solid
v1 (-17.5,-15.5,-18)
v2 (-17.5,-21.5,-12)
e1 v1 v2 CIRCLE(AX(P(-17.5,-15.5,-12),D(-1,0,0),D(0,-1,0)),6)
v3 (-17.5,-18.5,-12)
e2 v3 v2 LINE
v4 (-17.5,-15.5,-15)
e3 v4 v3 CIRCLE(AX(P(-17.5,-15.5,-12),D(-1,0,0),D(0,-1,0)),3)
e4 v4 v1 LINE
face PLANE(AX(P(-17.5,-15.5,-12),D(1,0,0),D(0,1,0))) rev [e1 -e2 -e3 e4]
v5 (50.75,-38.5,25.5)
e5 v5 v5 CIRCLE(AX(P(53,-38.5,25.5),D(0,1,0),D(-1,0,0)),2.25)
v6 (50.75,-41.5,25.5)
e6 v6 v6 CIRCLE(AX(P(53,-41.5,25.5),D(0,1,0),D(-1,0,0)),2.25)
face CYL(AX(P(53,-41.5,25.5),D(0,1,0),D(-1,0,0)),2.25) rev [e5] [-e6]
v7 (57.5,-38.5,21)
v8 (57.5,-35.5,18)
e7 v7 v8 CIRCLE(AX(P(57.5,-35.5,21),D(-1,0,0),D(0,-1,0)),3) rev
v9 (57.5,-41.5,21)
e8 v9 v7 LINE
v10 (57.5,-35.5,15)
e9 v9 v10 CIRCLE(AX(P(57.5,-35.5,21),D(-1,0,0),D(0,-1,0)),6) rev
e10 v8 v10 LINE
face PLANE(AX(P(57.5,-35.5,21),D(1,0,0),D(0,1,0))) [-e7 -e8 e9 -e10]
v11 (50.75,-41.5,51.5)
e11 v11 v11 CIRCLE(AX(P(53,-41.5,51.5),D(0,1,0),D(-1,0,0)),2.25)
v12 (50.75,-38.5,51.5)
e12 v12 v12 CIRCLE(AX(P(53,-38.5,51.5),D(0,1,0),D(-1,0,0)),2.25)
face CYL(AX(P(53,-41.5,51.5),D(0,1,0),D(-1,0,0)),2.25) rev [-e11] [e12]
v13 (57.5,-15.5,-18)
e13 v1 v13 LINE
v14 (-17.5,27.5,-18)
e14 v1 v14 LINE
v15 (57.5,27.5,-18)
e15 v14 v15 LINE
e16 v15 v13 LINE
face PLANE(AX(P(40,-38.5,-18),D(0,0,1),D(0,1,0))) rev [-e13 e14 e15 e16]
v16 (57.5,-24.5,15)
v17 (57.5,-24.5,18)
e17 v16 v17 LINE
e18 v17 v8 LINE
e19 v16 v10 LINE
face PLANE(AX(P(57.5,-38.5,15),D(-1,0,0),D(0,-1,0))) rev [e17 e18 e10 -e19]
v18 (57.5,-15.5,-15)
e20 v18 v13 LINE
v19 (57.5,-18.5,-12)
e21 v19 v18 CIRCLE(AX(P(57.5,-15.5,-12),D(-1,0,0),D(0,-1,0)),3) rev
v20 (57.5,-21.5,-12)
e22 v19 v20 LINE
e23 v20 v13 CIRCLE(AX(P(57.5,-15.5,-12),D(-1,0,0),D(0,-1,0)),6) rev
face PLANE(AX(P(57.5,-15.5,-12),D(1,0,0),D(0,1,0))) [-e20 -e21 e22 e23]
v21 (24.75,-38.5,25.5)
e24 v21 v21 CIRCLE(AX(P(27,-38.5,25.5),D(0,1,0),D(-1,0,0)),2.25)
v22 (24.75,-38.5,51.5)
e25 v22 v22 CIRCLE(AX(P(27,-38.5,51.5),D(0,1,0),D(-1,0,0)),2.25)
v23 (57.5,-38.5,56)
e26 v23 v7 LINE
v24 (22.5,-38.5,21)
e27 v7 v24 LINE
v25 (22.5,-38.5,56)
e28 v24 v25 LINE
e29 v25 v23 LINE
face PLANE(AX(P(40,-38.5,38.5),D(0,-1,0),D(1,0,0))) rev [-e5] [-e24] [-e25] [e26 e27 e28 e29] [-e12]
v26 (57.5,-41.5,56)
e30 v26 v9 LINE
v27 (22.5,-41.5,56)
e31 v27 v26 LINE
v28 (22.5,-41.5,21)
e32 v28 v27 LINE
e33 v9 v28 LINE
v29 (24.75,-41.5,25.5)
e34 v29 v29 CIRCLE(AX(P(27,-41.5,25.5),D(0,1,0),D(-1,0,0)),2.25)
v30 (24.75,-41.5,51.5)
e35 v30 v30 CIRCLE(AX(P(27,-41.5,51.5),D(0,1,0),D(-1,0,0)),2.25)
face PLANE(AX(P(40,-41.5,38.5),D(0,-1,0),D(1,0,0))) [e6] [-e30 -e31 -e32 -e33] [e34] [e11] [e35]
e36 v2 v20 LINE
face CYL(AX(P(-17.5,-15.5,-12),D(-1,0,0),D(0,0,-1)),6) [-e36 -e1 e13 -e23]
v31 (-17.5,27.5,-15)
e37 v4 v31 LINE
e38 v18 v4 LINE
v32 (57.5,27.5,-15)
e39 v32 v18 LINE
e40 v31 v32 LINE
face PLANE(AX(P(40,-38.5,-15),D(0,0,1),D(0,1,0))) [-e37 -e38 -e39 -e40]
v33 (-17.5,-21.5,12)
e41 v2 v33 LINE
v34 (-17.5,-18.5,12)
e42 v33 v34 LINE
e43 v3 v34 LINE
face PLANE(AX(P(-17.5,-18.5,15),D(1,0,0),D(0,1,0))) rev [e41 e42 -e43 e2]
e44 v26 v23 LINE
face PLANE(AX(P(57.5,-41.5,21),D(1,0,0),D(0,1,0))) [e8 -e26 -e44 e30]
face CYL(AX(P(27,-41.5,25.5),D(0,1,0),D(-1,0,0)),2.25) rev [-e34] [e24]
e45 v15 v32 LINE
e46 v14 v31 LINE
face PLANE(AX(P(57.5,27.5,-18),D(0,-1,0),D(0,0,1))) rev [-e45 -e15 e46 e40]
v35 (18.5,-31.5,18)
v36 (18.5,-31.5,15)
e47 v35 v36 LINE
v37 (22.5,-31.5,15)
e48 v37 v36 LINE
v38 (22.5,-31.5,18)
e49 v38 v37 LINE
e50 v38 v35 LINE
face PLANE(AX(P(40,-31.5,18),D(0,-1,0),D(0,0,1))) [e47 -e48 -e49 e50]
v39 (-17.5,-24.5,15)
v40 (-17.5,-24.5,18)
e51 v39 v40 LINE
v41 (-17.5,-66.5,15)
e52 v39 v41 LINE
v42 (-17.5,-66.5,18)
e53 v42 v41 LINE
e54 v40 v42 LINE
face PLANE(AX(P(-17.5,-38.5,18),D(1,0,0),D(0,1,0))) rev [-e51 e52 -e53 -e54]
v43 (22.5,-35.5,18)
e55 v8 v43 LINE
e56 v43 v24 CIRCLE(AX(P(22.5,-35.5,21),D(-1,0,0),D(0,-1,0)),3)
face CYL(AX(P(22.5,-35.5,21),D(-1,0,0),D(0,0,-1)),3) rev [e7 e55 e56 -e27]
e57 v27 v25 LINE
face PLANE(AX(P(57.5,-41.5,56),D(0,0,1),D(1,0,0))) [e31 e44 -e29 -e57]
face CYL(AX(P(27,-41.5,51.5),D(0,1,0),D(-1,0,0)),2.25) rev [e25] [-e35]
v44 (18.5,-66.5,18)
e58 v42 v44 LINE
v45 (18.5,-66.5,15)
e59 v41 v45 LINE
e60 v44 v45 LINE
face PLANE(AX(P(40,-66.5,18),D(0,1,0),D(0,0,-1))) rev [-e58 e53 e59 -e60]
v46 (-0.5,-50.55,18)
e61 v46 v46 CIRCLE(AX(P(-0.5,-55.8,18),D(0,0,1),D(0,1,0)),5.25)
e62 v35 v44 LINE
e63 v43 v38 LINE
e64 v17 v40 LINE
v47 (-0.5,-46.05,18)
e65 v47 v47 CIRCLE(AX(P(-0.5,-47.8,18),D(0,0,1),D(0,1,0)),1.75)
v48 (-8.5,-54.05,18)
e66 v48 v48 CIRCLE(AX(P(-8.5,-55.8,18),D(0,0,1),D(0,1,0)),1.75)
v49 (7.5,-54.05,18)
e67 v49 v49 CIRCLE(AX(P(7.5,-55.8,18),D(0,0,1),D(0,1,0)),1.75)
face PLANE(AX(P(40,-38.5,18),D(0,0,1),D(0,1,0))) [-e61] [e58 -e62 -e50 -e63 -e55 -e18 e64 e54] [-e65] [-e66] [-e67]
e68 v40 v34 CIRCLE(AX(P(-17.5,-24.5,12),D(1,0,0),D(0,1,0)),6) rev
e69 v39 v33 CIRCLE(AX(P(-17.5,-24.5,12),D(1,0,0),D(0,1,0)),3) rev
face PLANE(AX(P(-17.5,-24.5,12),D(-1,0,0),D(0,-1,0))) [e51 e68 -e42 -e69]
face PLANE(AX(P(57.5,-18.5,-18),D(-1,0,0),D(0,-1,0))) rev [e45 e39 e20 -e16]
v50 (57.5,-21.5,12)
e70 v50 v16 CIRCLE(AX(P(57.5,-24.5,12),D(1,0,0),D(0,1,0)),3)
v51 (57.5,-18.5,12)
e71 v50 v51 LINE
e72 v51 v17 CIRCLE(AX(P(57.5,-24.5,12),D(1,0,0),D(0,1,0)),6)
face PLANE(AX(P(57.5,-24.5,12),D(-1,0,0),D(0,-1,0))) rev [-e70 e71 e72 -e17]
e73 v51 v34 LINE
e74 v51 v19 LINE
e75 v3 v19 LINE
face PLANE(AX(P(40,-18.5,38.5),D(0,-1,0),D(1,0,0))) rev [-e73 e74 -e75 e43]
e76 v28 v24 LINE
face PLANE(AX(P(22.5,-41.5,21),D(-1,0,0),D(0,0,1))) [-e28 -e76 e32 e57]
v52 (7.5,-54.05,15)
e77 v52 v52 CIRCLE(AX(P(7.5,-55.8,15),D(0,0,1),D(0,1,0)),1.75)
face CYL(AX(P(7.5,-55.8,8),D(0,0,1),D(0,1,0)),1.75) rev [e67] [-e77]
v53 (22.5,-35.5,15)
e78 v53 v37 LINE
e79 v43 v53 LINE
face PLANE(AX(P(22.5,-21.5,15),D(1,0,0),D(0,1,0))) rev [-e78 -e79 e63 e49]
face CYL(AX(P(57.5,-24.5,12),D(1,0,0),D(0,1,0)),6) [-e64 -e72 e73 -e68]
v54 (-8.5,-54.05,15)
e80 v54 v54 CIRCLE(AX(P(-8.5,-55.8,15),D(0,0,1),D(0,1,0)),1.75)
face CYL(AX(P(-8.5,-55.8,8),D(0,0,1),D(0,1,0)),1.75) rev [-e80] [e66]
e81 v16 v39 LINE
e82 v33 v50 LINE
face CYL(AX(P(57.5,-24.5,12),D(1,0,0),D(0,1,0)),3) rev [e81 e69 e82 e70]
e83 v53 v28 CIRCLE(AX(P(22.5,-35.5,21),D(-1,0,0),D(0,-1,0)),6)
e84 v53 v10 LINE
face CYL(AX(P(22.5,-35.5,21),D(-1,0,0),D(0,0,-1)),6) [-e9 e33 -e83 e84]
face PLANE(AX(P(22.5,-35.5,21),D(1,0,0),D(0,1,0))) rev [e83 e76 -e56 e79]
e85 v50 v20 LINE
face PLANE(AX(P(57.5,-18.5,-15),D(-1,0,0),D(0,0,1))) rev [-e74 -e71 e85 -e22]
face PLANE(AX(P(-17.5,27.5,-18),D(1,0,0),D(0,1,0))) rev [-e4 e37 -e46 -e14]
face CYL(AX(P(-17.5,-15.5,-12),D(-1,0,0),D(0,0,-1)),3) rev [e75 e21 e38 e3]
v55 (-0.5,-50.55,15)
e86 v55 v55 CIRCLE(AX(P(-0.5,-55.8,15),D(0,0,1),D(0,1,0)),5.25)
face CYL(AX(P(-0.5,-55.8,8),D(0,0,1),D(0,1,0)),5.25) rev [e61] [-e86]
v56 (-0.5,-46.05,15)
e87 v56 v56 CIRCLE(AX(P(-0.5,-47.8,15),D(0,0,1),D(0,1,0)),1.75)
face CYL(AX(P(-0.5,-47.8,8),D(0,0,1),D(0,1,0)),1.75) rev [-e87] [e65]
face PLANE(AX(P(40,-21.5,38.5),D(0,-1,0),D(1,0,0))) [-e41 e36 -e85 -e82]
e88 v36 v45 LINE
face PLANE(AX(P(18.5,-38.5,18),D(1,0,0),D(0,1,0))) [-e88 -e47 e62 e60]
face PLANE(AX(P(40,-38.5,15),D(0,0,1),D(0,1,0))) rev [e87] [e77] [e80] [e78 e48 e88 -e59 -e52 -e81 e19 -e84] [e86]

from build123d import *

# Parameters (mm, degrees)
SKETCH1_W                    = 35
SKETCH1_H                    = 35
SKETCH1_R                    = 2.25
BASE_FLANGE1_DEPTH           = 3
EDGE_FLANGE1_DEPTH           = 35
SKETCH9_W                    = 36
SKETCH9_H                    = 35
BOSS_EXTRUDE1_DEPTH          = 3
EDGE_FLANGE2_STRIP_W         = 18
EDGE_FLANGE2_STRIP_H         = 3
EDGE_FLANGE2_STRIP_CUT_DEPTH = 75
EDGE_FLANGE2_DEPTH           = 75
EDGE_FLANGE3_STRIP_W         = 18
EDGE_FLANGE3_STRIP_H         = 3
EDGE_FLANGE3_STRIP_CUT_DEPTH = 75
EDGE_FLANGE3_DEPTH           = 75
SKETCH16_R                   = 5.25
SKETCH16_R_2                 = 1.75
CUT_EXTRUDE1_DEPTH           = 10
BODY_MOVE_COPY1_ANGLE        = 180


# Sheet-metal steps are written as plain solids
with BuildPart() as part:
    # Sketch1 → Base-Flange1 (new body)
    with BuildSketch(Plane.XY):
        Rectangle(SKETCH1_W, SKETCH1_H)
        with Locations((-13, 13)):
            Circle(SKETCH1_R, mode=Mode.SUBTRACT)
        with Locations((13, 13)):
            Circle(SKETCH1_R, mode=Mode.SUBTRACT)
        with Locations((13, -13)):
            Circle(SKETCH1_R, mode=Mode.SUBTRACT)
        with Locations((-13, -13)):
            Circle(SKETCH1_R, mode=Mode.SUBTRACT)
    extrude(amount=-BASE_FLANGE1_DEPTH)

    # Edge-Flange1 section (across the edge) → Edge-Flange1 (add)
    with BuildSketch(Plane(origin=(-17.5, -20.5, 0), x_dir=(0, 1, 0), z_dir=(1, 0, 0))):
        with BuildLine():
            Line((-3, 3), (-3, 17))
            Line((-3, 17), (0, 17))
            Line((0, 17), (0, 3))
            ThreePointArc((0, 3), (0.878679656, 0.878679656), (3, 0))
            Line((3, 0), (3, -3))
            ThreePointArc((3, -3), (-1.242640687, -1.242640687), (-3, 3))
        make_face()
    extrude(amount=EDGE_FLANGE1_DEPTH)

    # Sketch9 → Boss-Extrude1 (add)
    with BuildSketch(Plane.XZ.offset(23.5)):
        Polygon((57.5, 17), (17.5, 17), (17.5, 7), (21.5, 7), (57.5, 7), align=None)
        with Locations((39.5, -10.5)):
            Rectangle(SKETCH9_W, SKETCH9_H)
    extrude(amount=-BOSS_EXTRUDE1_DEPTH)

    # Edge-Flange2 strip (across the edge) → Edge-Flange2 strip cut (cut)
    with BuildSketch(Plane(origin=(57.5, -23.5, 17), x_dir=(0, 0, -1), z_dir=(-1, 0, 0))):
        with Locations((-6, -1.5)):
            Rectangle(EDGE_FLANGE2_STRIP_W, EDGE_FLANGE2_STRIP_H)
    extrude(amount=EDGE_FLANGE2_STRIP_CUT_DEPTH, mode=Mode.SUBTRACT)

    # Edge-Flange2 section (across the edge) → Edge-Flange2 (add)
    with BuildSketch(Plane(origin=(57.5, -23.5, 17), x_dir=(0, 0, -1), z_dir=(-1, 0, 0))):
        with BuildLine():
            Line((-3, 3), (-3, 30))
            Line((-3, 30), (0, 30))
            Line((0, 30), (0, 3))
            ThreePointArc((0, 3), (0.878679656, 0.878679656), (3, 0))
            Line((3, 0), (3, -3))
            ThreePointArc((3, -3), (-1.242640687, -1.242640687), (-3, 3))
        make_face()
    extrude(amount=EDGE_FLANGE2_DEPTH)

    # Edge-Flange3 strip (across the edge) → Edge-Flange3 strip cut (cut)
    with BuildSketch(Plane(origin=(-17.5, -53.5, 20), x_dir=(0, 1, 0), z_dir=(1, 0, 0))):
        with Locations((-6, -1.5)):
            Rectangle(EDGE_FLANGE3_STRIP_W, EDGE_FLANGE3_STRIP_H)
    extrude(amount=EDGE_FLANGE3_STRIP_CUT_DEPTH, mode=Mode.SUBTRACT)

    # Edge-Flange3 section (across the edge) → Edge-Flange3 (add)
    with BuildSketch(Plane(origin=(-17.5, -53.5, 20), x_dir=(0, 1, 0), z_dir=(1, 0, 0))):
        with BuildLine():
            Line((-3, 3), (-3, 46))
            Line((-3, 46), (0, 46))
            Line((0, 46), (0, 3))
            ThreePointArc((0, 3), (0.878679656, 0.878679656), (3, 0))
            Line((3, 0), (3, -3))
            ThreePointArc((3, -3), (-1.242640687, -1.242640687), (-3, 3))
        make_face()
    extrude(amount=EDGE_FLANGE3_DEPTH)

    # Sketch16 → Cut-Extrude1 (cut)
    with BuildSketch(Plane(origin=(0, -20.5, 0), x_dir=(1, 0, 0), z_dir=(0, 1, 0))):
        with Locations(Location((40.5, 17.3, 0), (0, 0, 270))):
            Circle(SKETCH16_R)
        with Locations(Location((40.5, 9.3, 0), (0, 0, 270))):
            Circle(SKETCH16_R_2)
        with Locations(Location((48.5, 17.3, 0), (0, 0, 270))):
            Circle(SKETCH16_R_2)
        with Locations(Location((32.5, 17.3, 0), (0, 0, 270))):
            Circle(SKETCH16_R_2)
    extrude(amount=-CUT_EXTRUDE1_DEPTH, mode=Mode.SUBTRACT)


with BuildPart() as part_1:
    # Body-Move/Copy1: moved
    add(part.part.moved(Location((0, 0, 0))).rotate(Axis((20, -19.25, 19.25), (-4.937700262163626e-15, 0.7071067811864181, 0.707106781186677)), BODY_MOVE_COPY1_ANGLE))


solid = part_1.part
